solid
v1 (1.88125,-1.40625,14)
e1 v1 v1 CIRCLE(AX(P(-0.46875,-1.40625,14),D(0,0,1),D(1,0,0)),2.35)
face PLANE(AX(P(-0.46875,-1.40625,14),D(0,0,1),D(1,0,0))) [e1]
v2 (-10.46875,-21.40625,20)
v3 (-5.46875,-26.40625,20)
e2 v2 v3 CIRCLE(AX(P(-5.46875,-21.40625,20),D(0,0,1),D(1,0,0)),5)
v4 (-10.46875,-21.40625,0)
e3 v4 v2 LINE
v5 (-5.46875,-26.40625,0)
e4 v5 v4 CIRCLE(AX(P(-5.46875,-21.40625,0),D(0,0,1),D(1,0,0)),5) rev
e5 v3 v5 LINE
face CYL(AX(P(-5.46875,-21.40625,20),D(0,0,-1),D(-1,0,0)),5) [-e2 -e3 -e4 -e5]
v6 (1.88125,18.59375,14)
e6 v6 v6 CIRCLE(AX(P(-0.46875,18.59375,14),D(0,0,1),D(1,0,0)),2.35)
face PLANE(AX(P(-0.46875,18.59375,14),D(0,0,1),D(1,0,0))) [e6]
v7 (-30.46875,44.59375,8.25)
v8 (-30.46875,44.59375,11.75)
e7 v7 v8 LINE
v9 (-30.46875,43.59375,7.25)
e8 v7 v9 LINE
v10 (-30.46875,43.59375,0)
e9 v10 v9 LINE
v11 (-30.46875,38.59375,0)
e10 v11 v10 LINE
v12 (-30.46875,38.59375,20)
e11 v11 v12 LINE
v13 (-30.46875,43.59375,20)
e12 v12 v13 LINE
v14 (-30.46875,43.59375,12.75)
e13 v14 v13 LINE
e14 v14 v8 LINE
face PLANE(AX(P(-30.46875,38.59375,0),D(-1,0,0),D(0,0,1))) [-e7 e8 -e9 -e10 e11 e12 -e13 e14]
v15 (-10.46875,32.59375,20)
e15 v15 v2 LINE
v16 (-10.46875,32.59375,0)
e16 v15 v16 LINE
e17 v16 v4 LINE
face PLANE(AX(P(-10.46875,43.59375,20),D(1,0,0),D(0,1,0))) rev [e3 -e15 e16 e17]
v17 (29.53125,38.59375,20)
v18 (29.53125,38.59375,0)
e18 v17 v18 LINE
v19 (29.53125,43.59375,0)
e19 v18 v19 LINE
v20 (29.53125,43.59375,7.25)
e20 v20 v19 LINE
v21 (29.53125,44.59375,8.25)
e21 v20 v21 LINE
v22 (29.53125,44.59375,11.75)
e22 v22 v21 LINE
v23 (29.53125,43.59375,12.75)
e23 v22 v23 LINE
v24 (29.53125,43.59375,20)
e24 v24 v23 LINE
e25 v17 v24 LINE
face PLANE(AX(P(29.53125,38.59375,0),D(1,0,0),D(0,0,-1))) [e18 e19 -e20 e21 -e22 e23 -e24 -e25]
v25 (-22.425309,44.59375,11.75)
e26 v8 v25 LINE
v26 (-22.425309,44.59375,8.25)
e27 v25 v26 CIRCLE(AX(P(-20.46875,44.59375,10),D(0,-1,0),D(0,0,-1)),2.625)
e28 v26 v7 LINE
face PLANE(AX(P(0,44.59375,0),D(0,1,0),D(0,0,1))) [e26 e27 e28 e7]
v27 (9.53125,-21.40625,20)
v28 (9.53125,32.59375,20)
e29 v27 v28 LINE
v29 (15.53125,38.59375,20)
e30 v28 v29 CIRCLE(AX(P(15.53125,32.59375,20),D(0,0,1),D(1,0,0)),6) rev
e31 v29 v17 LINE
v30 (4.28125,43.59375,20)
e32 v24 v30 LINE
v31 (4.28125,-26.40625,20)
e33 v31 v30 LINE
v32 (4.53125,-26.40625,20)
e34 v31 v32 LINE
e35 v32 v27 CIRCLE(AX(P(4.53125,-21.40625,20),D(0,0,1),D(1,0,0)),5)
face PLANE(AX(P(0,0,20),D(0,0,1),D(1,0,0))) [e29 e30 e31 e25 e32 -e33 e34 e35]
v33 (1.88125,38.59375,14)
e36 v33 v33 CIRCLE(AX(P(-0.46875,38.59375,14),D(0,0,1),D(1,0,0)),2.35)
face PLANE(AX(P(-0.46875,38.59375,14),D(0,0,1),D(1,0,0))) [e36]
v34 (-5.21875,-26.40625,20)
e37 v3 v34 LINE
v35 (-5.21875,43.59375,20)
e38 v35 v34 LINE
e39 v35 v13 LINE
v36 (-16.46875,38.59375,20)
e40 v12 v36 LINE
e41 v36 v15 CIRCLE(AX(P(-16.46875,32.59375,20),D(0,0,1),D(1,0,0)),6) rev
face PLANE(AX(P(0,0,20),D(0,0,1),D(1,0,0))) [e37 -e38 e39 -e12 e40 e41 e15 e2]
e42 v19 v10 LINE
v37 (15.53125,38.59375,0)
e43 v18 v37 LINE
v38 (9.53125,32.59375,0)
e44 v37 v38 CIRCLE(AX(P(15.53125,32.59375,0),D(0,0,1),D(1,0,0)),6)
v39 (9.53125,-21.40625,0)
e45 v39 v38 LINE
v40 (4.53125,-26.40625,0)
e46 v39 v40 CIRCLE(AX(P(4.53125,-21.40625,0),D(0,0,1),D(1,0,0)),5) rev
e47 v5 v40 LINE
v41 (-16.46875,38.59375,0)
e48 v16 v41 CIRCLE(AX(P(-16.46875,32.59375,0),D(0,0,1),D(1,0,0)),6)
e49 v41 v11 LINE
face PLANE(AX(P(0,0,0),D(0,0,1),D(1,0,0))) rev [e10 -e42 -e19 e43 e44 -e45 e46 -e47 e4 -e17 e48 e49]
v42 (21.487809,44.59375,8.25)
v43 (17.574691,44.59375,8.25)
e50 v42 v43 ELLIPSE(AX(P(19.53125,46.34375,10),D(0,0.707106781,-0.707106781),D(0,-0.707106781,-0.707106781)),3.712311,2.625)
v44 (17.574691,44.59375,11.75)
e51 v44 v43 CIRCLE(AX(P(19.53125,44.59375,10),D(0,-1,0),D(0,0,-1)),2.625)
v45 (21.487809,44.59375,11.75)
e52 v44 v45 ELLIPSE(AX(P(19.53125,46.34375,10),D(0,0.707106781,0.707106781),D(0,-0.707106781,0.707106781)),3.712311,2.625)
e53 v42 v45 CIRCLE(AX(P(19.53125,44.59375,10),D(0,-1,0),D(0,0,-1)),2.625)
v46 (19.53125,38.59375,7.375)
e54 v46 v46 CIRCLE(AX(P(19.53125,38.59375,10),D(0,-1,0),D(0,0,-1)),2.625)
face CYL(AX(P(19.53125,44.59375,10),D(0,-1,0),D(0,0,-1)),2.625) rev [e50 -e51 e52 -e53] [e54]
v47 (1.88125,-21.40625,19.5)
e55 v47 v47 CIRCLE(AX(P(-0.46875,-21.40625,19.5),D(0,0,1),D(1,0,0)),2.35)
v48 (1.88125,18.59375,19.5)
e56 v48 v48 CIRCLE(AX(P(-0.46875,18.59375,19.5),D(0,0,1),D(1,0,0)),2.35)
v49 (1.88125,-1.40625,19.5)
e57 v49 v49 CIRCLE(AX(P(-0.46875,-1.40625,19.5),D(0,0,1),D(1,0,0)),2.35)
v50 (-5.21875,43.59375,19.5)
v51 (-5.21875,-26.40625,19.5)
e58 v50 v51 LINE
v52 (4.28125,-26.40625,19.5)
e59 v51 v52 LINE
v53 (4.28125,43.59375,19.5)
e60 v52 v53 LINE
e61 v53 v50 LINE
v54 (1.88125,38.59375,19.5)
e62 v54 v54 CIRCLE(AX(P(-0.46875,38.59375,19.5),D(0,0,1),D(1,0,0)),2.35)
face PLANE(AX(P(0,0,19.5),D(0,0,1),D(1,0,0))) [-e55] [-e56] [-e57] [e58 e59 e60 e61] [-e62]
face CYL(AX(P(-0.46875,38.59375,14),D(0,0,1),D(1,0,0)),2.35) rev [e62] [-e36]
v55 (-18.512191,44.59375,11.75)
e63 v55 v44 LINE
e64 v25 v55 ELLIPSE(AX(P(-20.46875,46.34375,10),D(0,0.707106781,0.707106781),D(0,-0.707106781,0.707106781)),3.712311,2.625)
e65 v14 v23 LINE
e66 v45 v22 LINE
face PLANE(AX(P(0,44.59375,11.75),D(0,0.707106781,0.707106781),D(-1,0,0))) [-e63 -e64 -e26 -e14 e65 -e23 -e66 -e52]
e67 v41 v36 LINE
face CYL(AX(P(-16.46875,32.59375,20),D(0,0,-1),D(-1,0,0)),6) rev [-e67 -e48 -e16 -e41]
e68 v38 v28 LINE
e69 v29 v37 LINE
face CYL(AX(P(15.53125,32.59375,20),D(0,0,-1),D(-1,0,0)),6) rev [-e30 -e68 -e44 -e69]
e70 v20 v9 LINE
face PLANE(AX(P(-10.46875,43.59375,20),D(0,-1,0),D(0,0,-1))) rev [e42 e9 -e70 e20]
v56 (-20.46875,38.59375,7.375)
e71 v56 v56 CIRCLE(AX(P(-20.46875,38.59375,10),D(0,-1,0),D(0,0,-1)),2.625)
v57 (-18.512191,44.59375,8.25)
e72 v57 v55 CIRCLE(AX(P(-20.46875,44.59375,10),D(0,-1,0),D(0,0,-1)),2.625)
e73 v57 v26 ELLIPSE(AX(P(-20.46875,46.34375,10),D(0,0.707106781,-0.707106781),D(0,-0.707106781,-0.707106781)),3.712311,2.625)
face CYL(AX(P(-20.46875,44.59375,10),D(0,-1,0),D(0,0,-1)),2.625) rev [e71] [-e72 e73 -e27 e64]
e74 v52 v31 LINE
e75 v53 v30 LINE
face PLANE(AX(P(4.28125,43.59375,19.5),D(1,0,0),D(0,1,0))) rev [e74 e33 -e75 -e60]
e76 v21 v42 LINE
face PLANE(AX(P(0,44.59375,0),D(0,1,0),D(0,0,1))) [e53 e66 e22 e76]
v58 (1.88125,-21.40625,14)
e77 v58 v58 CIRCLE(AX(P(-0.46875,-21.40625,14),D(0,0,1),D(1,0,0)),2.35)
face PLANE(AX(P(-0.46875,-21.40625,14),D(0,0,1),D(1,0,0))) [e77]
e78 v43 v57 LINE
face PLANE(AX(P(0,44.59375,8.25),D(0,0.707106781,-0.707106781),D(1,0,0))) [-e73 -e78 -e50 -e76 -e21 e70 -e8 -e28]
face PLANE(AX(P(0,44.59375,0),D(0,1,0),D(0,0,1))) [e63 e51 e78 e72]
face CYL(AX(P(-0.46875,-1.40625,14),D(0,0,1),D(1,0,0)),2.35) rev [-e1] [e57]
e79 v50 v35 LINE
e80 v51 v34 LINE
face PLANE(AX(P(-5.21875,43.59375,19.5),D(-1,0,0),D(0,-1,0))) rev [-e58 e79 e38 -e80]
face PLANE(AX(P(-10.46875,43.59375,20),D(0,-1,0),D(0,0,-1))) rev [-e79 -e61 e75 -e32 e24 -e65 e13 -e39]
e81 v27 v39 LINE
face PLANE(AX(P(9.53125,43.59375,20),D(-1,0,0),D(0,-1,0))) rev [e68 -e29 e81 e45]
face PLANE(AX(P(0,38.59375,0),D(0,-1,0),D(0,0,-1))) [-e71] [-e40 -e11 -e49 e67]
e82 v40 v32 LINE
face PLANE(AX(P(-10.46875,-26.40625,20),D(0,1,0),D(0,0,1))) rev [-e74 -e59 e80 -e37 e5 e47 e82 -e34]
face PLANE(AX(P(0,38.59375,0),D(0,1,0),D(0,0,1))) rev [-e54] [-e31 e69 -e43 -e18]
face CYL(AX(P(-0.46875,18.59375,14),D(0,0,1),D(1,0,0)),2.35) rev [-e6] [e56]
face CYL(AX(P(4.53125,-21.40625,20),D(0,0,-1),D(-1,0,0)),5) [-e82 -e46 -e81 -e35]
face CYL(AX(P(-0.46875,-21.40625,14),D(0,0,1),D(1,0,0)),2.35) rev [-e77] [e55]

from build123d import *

# Parameters (mm, degrees)
SKETCH2_W           = 20
SKETCH2_H           = 70
BOSS_EXTRUDE1_DEPTH = 20
SKETCH3_W           = 9.5
SKETCH3_H           = 70
CUT_EXTRUDE1_DEPTH  = 0.5
SKETCH4_R           = 2.35
CUT_EXTRUDE2_DEPTH  = 5.5
SKETCH5_W           = 20
SKETCH5_H           = 20
BOSS_EXTRUDE2_DEPTH = 5
FILLET1_R           = 6
FILLET2_R           = 6
SKETCH6_W           = 60
SKETCH6_H           = 5.5
BOSS_EXTRUDE3_DEPTH = 1
CHAMFER1_SIZE       = 1
SKETCH7_R           = 2.625
CUT_EXTRUDE3_DEPTH  = 75.520767082
FILLET3_R           = 5
FILLET4_R           = 5


with BuildPart() as part:
    # Sketch2 → Boss-Extrude1 (new body)
    with BuildSketch(Plane.XY):
        with Locations((-0.46875, 8.59375)):
            Rectangle(SKETCH2_W, SKETCH2_H)
    extrude(amount=BOSS_EXTRUDE1_DEPTH)

    # Sketch3 → Cut-Extrude1 (cut)
    with BuildSketch(Plane.XY.offset(20)):
        with Locations((-0.46875, 8.59375)):
            Rectangle(SKETCH3_W, SKETCH3_H)
    extrude(amount=-CUT_EXTRUDE1_DEPTH, mode=Mode.SUBTRACT)

    # Sketch4 → Cut-Extrude2 (cut)
    with BuildSketch(Plane.XY.offset(19.5)):
        with Locations((-0.46875, 38.59375)):
            Circle(SKETCH4_R)
        with Locations((-0.46875, 18.59375)):
            Circle(SKETCH4_R)
        with Locations((-0.46875, -1.40625)):
            Circle(SKETCH4_R)
        with Locations((-0.46875, 78.59375)):
            Circle(SKETCH4_R)
        with Locations((-0.46875, -21.40625)):
            Circle(SKETCH4_R)
        with Locations((-0.46875, 58.59375)):
            Circle(SKETCH4_R)
    extrude(amount=-CUT_EXTRUDE2_DEPTH, mode=Mode.SUBTRACT)

    # Sketch5 → Boss-Extrude2 (add)
    with BuildSketch(Plane(origin=(0, 43.59375, 0), x_dir=(1, 0, 0), z_dir=(0, 1, 0))):
        with Locations((19.53125, -10)):
            Rectangle(SKETCH5_W, SKETCH5_H)
        with Locations((-20.46875, -10)):
            Rectangle(SKETCH5_W, SKETCH5_H)
    extrude(amount=-BOSS_EXTRUDE2_DEPTH)

    # Fillet1
    fillet1_edges = [part.edges().sort_by_distance(p)[0] for p in [
        (9.53125, 38.59375, 10),
    ]]
    fillet(fillet1_edges, radius=FILLET1_R)

    # Fillet2
    fillet2_edges = [part.edges().sort_by_distance(p)[0] for p in [
        (-10.46875, 38.59375, 10),
    ]]
    fillet(fillet2_edges, radius=FILLET2_R)

    # Sketch6 → Boss-Extrude3 (add)
    with BuildSketch(Plane(origin=(0, 43.59375, 0), x_dir=(1, 0, 0), z_dir=(0, 1, 0))):
        with Locations((-0.46875, -10)):
            Rectangle(SKETCH6_W, SKETCH6_H)
    extrude(amount=BOSS_EXTRUDE3_DEPTH)

    # Chamfer1
    chamfer1_edges = [part.edges().sort_by_distance(p)[0] for p in [
        (-0.46875, 44.59375, 7.25),
        (-0.46875, 44.59375, 12.75),
    ]]
    chamfer(chamfer1_edges, length=CHAMFER1_SIZE - 0.0001)  # a hair under: the kernel refuses the full size

    # Sketch7 → Cut-Extrude3 (cut, through all)
    with BuildSketch(Plane.XZ.offset(-38.59375)):
        with Locations(Location((19.53125, 10, 0), (0, 0, 270))):
            Circle(SKETCH7_R)
        with Locations(Location((-20.46875, 10, 0), (0, 0, 270))):
            Circle(SKETCH7_R)
    extrude(amount=-CUT_EXTRUDE3_DEPTH, mode=Mode.SUBTRACT)

    # Fillet3
    fillet3_edges = [part.edges().sort_by_distance(p)[0] for p in [
        (-10.46875, -26.40625, 10),
    ]]
    fillet(fillet3_edges, radius=FILLET3_R)

    # Fillet4
    fillet4_edges = [part.edges().sort_by_distance(p)[0] for p in [
        (9.53125, -26.40625, 10),
    ]]
    fillet(fillet4_edges, radius=FILLET4_R)


solid = part.part
